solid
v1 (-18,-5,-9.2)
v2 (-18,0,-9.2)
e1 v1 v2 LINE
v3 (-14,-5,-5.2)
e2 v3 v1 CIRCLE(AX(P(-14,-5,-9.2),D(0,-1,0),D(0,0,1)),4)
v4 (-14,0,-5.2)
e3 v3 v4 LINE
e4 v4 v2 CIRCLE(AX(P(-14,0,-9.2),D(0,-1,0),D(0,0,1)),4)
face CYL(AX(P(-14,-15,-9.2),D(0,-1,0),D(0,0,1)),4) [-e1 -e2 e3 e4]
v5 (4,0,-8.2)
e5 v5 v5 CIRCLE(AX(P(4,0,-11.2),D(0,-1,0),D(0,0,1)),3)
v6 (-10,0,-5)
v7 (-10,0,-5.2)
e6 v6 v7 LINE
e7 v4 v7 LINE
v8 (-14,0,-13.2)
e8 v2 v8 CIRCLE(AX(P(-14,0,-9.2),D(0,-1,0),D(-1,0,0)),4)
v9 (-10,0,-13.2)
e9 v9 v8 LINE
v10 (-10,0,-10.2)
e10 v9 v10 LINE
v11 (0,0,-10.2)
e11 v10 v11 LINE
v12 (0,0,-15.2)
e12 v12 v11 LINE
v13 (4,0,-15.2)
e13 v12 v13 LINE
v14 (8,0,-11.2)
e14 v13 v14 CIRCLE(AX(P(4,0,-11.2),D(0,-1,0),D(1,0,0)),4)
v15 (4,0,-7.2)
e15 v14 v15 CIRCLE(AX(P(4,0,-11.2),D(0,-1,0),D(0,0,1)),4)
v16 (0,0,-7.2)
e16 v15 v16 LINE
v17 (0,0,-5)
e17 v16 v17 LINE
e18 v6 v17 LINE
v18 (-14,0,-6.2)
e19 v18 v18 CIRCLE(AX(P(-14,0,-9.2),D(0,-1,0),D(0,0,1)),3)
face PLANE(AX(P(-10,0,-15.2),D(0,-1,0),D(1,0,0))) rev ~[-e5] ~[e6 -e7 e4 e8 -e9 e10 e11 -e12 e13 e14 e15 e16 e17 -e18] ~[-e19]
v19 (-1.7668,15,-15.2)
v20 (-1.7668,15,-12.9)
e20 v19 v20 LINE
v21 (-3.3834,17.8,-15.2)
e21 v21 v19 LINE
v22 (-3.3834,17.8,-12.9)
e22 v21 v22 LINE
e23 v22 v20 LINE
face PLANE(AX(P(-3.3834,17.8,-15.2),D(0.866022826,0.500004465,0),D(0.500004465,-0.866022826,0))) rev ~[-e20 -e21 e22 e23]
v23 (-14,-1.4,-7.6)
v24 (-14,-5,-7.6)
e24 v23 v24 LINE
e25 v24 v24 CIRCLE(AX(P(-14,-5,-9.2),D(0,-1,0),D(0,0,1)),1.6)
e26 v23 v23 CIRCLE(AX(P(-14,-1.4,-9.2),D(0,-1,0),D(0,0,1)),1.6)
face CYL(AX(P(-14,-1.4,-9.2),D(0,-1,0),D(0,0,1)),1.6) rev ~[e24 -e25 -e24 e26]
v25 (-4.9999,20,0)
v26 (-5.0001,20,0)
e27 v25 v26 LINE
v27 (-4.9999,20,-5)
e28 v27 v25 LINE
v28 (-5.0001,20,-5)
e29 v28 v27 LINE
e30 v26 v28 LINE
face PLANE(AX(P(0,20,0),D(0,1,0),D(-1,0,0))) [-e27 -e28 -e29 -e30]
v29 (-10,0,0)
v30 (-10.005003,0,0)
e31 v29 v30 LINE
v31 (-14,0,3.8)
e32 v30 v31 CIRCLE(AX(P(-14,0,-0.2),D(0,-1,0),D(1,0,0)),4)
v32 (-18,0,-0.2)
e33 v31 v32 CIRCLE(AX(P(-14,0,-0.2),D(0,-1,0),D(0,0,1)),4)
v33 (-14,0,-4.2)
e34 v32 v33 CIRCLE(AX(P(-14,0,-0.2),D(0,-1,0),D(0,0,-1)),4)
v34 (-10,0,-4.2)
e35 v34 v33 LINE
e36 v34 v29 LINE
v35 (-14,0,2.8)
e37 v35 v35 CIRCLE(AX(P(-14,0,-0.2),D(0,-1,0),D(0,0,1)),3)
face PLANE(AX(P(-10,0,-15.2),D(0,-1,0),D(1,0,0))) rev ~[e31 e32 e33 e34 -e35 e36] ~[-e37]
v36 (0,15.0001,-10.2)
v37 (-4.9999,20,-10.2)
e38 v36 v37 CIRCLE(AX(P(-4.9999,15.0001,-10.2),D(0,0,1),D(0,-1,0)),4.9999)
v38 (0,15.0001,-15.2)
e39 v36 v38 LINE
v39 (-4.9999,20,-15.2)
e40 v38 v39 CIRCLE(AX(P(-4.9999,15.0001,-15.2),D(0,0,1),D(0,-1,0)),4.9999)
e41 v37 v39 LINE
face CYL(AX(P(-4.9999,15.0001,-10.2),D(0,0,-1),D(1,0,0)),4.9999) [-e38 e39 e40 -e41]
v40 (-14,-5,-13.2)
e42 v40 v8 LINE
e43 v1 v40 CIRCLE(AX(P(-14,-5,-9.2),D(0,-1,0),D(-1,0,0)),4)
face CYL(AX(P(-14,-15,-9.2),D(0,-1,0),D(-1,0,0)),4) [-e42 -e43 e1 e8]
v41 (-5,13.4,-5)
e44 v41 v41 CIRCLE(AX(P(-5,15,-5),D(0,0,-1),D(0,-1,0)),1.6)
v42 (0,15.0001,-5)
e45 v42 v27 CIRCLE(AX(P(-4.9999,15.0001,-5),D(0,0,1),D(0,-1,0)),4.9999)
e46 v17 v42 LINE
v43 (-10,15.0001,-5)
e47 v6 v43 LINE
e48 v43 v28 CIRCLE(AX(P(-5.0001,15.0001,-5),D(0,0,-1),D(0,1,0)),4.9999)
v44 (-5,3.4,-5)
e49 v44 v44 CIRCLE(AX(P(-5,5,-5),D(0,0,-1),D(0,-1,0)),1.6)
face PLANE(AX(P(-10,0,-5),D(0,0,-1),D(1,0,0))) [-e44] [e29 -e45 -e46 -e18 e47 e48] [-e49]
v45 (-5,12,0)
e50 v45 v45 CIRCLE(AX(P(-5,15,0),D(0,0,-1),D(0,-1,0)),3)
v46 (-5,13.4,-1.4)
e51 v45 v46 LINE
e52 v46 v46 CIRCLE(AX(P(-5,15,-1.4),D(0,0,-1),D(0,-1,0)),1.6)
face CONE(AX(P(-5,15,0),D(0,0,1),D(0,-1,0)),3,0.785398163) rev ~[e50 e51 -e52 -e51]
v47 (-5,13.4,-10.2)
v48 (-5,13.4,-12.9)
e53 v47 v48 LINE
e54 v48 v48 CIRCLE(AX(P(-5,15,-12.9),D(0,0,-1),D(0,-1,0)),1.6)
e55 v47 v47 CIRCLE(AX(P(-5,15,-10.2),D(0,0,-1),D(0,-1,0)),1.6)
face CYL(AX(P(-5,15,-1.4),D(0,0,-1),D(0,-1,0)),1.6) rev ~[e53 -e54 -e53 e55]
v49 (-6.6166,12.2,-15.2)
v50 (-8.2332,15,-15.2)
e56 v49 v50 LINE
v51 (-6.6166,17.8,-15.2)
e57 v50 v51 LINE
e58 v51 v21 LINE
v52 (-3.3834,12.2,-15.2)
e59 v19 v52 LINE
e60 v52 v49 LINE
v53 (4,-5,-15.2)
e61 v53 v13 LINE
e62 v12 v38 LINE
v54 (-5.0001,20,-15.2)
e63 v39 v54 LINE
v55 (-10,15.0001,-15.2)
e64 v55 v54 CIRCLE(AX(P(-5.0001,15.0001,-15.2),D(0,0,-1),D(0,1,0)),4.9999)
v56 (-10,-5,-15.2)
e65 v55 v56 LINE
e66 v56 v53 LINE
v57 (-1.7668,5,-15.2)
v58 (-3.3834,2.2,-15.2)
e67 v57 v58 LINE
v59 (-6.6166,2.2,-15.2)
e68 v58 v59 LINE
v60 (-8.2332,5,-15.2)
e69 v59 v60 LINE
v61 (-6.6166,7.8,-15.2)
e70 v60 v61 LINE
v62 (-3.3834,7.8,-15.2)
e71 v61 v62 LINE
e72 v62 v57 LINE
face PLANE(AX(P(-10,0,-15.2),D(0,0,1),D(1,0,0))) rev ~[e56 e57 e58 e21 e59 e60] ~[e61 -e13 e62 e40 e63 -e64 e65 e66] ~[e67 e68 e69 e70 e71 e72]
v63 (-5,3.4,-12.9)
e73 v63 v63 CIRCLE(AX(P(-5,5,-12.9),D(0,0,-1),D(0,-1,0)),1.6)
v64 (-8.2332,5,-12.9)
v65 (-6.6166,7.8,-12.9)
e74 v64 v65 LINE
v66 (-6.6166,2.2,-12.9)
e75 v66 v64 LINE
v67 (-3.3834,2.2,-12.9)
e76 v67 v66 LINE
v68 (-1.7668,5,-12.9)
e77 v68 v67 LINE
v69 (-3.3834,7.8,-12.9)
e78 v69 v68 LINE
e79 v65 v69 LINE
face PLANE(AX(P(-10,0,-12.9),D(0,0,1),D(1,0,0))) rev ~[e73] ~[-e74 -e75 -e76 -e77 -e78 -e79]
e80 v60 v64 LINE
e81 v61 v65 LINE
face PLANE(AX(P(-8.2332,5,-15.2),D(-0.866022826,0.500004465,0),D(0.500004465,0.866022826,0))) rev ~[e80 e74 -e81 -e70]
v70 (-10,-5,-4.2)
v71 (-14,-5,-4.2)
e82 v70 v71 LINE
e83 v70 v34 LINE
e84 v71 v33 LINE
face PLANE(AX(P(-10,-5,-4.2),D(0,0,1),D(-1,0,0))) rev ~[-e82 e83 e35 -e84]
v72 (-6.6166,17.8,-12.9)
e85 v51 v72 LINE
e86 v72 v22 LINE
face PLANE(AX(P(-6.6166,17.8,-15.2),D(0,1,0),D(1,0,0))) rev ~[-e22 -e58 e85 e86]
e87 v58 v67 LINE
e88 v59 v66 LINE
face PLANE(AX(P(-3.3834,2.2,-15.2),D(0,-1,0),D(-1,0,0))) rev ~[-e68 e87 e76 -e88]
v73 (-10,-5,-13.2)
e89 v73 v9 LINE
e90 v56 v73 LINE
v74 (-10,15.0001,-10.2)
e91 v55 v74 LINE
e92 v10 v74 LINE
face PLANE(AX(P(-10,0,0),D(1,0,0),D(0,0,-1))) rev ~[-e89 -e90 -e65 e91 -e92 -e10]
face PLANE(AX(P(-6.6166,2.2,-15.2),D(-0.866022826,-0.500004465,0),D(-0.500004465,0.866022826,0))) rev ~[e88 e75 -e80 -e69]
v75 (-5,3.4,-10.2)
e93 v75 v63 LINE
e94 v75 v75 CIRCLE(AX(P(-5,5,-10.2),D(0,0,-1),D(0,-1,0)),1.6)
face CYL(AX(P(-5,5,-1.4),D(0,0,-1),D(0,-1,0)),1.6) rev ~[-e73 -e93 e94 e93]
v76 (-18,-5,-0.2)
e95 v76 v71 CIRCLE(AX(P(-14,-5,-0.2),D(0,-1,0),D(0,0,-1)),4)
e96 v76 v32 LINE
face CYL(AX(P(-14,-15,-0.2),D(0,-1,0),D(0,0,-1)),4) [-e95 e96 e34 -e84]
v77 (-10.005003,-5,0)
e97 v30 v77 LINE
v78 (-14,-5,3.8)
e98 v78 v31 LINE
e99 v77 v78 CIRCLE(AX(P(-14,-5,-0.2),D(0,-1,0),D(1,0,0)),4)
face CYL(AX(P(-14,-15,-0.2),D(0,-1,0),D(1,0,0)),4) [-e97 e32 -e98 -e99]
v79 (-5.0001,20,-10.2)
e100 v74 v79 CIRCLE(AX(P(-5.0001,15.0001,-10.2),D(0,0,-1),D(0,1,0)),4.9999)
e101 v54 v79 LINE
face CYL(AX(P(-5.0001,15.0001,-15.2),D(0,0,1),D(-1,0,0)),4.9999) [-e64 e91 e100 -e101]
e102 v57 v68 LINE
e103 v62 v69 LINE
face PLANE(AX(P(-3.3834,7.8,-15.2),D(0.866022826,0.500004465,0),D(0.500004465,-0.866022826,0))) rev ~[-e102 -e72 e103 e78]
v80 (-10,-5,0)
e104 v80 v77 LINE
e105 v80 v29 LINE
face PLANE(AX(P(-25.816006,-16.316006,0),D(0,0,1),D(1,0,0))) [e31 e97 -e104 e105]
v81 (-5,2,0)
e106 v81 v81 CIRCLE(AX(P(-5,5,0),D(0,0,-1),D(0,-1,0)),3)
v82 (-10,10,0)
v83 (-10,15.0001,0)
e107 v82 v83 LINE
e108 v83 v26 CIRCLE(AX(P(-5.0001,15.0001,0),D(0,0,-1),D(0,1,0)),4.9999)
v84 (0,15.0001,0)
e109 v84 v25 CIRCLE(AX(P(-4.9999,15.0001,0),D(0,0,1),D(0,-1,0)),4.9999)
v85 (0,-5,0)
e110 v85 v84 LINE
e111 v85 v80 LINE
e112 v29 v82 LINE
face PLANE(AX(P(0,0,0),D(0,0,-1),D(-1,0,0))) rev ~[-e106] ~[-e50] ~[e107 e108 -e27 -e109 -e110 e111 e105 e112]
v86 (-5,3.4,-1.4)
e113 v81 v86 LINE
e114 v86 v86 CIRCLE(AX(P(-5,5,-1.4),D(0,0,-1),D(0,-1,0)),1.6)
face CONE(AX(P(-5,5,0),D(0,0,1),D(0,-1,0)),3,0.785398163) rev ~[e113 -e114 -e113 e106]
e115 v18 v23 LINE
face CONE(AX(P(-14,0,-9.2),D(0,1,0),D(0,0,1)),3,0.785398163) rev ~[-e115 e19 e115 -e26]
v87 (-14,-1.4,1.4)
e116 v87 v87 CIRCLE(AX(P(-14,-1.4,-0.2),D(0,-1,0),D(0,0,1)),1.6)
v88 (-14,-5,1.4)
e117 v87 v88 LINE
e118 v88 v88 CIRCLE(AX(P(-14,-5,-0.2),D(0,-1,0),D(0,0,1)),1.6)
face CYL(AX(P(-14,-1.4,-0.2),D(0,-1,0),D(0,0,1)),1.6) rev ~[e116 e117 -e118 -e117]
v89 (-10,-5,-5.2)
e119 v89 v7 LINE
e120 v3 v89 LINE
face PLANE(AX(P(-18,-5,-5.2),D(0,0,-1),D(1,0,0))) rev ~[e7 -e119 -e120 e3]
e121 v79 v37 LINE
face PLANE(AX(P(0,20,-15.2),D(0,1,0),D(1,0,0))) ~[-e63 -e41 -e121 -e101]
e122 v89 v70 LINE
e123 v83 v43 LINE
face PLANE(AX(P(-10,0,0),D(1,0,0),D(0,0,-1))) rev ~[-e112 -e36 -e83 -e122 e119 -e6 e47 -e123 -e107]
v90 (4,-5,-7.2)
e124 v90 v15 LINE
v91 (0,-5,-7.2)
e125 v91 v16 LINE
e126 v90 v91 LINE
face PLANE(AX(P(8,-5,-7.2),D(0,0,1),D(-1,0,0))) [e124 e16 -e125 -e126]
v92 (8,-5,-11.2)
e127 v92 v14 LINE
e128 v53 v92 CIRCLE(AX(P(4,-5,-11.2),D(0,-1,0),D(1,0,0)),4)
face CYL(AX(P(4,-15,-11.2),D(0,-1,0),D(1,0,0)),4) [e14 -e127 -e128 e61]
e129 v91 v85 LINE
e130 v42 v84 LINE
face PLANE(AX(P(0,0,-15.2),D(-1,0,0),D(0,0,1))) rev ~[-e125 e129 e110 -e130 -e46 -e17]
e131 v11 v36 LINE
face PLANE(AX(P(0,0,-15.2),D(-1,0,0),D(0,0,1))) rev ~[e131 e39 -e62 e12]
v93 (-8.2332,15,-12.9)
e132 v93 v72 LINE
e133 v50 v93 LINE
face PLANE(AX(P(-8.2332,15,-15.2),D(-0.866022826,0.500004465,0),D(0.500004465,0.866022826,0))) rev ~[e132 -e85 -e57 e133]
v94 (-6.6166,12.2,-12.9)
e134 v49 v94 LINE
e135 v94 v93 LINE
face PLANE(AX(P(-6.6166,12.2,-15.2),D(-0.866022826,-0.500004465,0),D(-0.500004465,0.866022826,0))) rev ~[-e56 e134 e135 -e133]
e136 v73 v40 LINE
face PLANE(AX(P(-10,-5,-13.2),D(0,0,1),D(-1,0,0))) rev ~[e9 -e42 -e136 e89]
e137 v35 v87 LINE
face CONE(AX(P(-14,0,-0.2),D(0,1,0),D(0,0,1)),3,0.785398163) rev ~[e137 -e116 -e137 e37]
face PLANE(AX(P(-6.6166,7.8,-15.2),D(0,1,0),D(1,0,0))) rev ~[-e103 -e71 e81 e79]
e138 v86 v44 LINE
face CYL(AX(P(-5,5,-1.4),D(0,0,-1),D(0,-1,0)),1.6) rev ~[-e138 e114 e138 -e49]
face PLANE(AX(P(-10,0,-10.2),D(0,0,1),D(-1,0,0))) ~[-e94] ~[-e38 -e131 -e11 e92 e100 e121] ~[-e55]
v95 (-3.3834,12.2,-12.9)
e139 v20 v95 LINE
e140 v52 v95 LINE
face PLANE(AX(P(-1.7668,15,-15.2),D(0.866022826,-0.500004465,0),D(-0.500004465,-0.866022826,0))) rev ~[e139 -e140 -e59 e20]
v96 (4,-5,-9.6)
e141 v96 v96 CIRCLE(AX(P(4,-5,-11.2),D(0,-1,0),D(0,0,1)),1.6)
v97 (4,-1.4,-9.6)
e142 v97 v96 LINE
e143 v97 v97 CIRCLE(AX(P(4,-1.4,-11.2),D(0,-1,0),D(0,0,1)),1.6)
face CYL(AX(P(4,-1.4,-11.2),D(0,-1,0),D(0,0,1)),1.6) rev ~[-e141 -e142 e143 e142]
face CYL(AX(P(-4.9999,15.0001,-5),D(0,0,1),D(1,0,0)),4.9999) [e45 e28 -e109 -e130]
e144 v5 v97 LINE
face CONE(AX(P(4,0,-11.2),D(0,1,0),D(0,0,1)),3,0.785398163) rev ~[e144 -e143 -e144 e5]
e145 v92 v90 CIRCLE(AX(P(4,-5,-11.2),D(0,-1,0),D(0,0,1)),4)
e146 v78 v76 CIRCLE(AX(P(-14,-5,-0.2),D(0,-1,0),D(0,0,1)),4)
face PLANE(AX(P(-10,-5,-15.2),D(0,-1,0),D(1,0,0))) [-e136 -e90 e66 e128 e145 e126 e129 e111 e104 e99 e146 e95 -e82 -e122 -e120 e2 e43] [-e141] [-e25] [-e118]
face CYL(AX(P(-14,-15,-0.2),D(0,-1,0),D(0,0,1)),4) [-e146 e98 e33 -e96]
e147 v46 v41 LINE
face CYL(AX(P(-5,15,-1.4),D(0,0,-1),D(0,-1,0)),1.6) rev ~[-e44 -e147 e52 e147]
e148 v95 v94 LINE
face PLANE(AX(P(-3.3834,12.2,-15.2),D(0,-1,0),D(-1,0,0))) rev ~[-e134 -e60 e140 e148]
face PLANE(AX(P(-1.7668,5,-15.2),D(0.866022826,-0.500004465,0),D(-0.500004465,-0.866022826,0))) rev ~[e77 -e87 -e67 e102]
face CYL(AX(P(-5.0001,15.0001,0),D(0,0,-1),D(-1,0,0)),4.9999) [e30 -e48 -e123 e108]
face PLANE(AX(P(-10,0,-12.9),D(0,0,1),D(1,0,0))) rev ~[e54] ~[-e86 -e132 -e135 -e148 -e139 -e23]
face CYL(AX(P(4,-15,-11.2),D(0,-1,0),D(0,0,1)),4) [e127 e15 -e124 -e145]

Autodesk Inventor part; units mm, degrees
ref_plane "YZ Plane" through (0, 0, 0) normal (1, 0, 0) x (0, 1, 0)
sketch "Эскиз3" plane through (0, 0, 0) normal (0, 1, 0) x (-1, 0, 0)
  line L0 (0, 0) -> (10, 0)
  line L1 (10, 0) -> (10, -5)
  line L2 (10, -5) -> (0, -5)
  line L3 (0, -5) -> (0, 0)
  dimension "d6" = 10
  dimension "d7" = 5
extrude "Выдавливание2" add sketch "Эскиз3" along normal blind 20
fillet "Сопряжение1" radius 5 2 edges at (0, 20, -2.5) (-10, 20, -2.5)
ref_plane "РабПлоскость1" through (0, 0, -7.6) normal (0, 0, -1) x (-1, 0, 0)
mirror "Зеркальное отражение1" about plane through (0, 0, -7.6) normal (0, 0, -1)
ref_plane "РабПлоскость2" through (0, 0, -12.9) normal (0, 0, -1) x (-1, 0, 0)
sketch "Эскиз5" plane through (-10, 0, 0) normal (0, 0, 1) x (1, 0, 0)
  arc A0 (10, 15) -> (0, 15) centre (5, 15) ccw projected
  line L0 (5, 15) -> (5, 5)
  dimension "d23" = 10
hole "Отверстие1" at (-5, 15, 0) at (-5, 5, 0) direction (0, 0, -1) diameter 3.2 depth 12.9 countersink diameter 6 countersink angle 90
sketch "Эскиз6" plane through (-10, 0, -15.2) normal (0, 0, 1) x (1, 0, 0)
  circle A0 centre (5, 15) radius 1.6 projected
  circle A1 centre (5, 5) radius 1.6 projected
  line L0 (6.6166, 17.8) -> (8.2332, 15)
  line L1 (8.2332, 15) -> (6.6166, 12.2)
  line L2 (6.6166, 12.2) -> (3.3834, 12.2)
  line L3 (3.3834, 12.2) -> (1.7668, 15)
  line L4 (1.7668, 15) -> (3.3834, 17.8)
  line L5 (3.3834, 17.8) -> (6.6166, 17.8)
  line L6 (6.6166, 7.8) -> (8.2332, 5)
  line L7 (8.2332, 5) -> (6.6166, 2.2)
  line L8 (6.6166, 2.2) -> (3.3834, 2.2)
  line L9 (3.3834, 2.2) -> (1.7668, 5)
  line L10 (1.7668, 5) -> (3.3834, 7.8)
  line L11 (3.3834, 7.8) -> (6.6166, 7.8)
  point P0 (10, 0)
  dimension "d24" = 5.6
  dimension "d25" = 5.6
extrude "Выдавливание3" cut sketch "Эскиз6" along normal up to surface (2.3 mm away) contours A0 | A1 | L0 L1 L2 L3 L4 L5 | L6 L7 L8 L9 L10 L11
sketch "Эскиз9" plane through (-10, 0, -15.2) normal (0, -1, 0) x (1, 0, 0)
  line L0 (0, 5) -> (0, 0) projected
  line L1 (10, 15.2) -> (0, 15.2)
  line L2 (0, 15.2) -> (0, 0)
  line L3 (0, 0) -> (10, 0)
  line L4 (10, 0) -> (10, 15.2)
extrude "Выдавливание5" add sketch "Эскиз9" along normal blind 5
sketch "Эскиз11" plane through (-10, -5, -15.2) normal (0, -1, 0) x (1, 0, 0)
  line L0 (0, 15.2) -> (0, 0) projected
  line L1 (0, 0) -> (10, 0) projected
  line L2 (10, 0) -> (10, 15.2) projected
  line L3 (10, 15.2) -> (0, 15.2) projected
  line L4 (10, 0) -> (18, 0)
  line L5 (18, 0) -> (18, 8)
  line L6 (18, 8) -> (10, 8)
  line L7 (10, 8) -> (10, 0)
  line L8 (0, 0) -> (0, 2)
  line L9 (0, 5) -> (0, 0) projected
  line L10 (0, 2) -> (-8, 2)
  line L11 (-8, 2) -> (-8, 10)
  line L12 (-8, 10) -> (0, 10)
  line L13 (0, 10) -> (0, 2)
  line L14 (0, 10) -> (0, 11)
  line L15 (0, 10.2) -> (0, 15.2) projected
  line L16 (0, 11) -> (-8, 11)
  line L17 (-8, 11) -> (-8, 19)
  line L18 (-8, 19) -> (0, 19)
  line L19 (0, 19) -> (0, 11)
  point P0 (0, 2)
  dimension "d75" = 8
  dimension "d76" = 8
  dimension "d77" = 2
  dimension "d78" = 8
  dimension "d79" = 8
  dimension "d80" = 1
  dimension "d81" = 8
  dimension "d82" = 8
extrude "Выдавливание6" add sketch "Эскиз11" against normal blind 5 contours L0 L16 L17 L18 L19 | L6 L5 L4 L2 | L0 L10 L11 L12
sketch "Эскиз12" plane through (-10, 0, -15.2) normal (0, 1, 0) x (1, 0, 0)
  line L0 (10, -10.2) -> (0, -10.2) projected
  line L1 (10, -8) -> (10, -10.2) projected
  line L2 (10, -8) -> (18, -8) projected
  line L3 (18, -8) -> (18, 0) projected
  line L4 (18, 0) -> (10, 0) projected
  line L5 (10, -5) -> (10, 0) projected
  line L6 (10, -5) -> (0, -5) projected
  line L7 (0, -2) -> (0, -5) projected
  line L8 (0, -2) -> (-8, -2) projected
  line L9 (-8, -2) -> (-8, -10) projected
  line L10 (-8, -10) -> (0, -10) projected
  line L11 (0, -10.2) -> (0, -10) projected
  line L12 (0, -11) -> (-8, -11) projected
  line L13 (-8, -11) -> (-8, -19) projected
  line L14 (-8, -19) -> (0, -19) projected
  line L15 (0, -19) -> (0, -15.2) projected
  line L16 (0, -11) -> (0, -15.2) projected
  line L17 (0, -2) -> (-8, -2) projected
  line L18 (-4, -2) -> (-4, -10)
  line L19 (0, -11) -> (-8, -11) projected
  line L20 (-4, -11) -> (-4, -19)
  line L21 (18, 0) -> (10, 0) projected
  line L22 (14, 0) -> (14, -8)
  point P0 (10, -15.2)
  point P1 (14, -4)
  point P2 (-4, -6)
  point P3 (-4, -15)
hole "Отверстие4" at (-14, 0, -9.2) at (4, 0, -11.2) at (-14, 0, -0.2) direction (0, -1, 0) diameter 3.2 end through all countersink diameter 6 countersink angle 90
fillet "Сопряжение2" radius 4 7 edges at (8, -2.5, -15.2) (8, -2.5, -7.2) (-18, -2.5, -13.2) (-18, -2.5, -5.2) (-18, -2.5, -4.2) (-18, -2.5, 3.8) (-10, -2.5, 3.8)
equation "\"d25\" = d24"
properties part number "Крепление камеры к корпусу"
